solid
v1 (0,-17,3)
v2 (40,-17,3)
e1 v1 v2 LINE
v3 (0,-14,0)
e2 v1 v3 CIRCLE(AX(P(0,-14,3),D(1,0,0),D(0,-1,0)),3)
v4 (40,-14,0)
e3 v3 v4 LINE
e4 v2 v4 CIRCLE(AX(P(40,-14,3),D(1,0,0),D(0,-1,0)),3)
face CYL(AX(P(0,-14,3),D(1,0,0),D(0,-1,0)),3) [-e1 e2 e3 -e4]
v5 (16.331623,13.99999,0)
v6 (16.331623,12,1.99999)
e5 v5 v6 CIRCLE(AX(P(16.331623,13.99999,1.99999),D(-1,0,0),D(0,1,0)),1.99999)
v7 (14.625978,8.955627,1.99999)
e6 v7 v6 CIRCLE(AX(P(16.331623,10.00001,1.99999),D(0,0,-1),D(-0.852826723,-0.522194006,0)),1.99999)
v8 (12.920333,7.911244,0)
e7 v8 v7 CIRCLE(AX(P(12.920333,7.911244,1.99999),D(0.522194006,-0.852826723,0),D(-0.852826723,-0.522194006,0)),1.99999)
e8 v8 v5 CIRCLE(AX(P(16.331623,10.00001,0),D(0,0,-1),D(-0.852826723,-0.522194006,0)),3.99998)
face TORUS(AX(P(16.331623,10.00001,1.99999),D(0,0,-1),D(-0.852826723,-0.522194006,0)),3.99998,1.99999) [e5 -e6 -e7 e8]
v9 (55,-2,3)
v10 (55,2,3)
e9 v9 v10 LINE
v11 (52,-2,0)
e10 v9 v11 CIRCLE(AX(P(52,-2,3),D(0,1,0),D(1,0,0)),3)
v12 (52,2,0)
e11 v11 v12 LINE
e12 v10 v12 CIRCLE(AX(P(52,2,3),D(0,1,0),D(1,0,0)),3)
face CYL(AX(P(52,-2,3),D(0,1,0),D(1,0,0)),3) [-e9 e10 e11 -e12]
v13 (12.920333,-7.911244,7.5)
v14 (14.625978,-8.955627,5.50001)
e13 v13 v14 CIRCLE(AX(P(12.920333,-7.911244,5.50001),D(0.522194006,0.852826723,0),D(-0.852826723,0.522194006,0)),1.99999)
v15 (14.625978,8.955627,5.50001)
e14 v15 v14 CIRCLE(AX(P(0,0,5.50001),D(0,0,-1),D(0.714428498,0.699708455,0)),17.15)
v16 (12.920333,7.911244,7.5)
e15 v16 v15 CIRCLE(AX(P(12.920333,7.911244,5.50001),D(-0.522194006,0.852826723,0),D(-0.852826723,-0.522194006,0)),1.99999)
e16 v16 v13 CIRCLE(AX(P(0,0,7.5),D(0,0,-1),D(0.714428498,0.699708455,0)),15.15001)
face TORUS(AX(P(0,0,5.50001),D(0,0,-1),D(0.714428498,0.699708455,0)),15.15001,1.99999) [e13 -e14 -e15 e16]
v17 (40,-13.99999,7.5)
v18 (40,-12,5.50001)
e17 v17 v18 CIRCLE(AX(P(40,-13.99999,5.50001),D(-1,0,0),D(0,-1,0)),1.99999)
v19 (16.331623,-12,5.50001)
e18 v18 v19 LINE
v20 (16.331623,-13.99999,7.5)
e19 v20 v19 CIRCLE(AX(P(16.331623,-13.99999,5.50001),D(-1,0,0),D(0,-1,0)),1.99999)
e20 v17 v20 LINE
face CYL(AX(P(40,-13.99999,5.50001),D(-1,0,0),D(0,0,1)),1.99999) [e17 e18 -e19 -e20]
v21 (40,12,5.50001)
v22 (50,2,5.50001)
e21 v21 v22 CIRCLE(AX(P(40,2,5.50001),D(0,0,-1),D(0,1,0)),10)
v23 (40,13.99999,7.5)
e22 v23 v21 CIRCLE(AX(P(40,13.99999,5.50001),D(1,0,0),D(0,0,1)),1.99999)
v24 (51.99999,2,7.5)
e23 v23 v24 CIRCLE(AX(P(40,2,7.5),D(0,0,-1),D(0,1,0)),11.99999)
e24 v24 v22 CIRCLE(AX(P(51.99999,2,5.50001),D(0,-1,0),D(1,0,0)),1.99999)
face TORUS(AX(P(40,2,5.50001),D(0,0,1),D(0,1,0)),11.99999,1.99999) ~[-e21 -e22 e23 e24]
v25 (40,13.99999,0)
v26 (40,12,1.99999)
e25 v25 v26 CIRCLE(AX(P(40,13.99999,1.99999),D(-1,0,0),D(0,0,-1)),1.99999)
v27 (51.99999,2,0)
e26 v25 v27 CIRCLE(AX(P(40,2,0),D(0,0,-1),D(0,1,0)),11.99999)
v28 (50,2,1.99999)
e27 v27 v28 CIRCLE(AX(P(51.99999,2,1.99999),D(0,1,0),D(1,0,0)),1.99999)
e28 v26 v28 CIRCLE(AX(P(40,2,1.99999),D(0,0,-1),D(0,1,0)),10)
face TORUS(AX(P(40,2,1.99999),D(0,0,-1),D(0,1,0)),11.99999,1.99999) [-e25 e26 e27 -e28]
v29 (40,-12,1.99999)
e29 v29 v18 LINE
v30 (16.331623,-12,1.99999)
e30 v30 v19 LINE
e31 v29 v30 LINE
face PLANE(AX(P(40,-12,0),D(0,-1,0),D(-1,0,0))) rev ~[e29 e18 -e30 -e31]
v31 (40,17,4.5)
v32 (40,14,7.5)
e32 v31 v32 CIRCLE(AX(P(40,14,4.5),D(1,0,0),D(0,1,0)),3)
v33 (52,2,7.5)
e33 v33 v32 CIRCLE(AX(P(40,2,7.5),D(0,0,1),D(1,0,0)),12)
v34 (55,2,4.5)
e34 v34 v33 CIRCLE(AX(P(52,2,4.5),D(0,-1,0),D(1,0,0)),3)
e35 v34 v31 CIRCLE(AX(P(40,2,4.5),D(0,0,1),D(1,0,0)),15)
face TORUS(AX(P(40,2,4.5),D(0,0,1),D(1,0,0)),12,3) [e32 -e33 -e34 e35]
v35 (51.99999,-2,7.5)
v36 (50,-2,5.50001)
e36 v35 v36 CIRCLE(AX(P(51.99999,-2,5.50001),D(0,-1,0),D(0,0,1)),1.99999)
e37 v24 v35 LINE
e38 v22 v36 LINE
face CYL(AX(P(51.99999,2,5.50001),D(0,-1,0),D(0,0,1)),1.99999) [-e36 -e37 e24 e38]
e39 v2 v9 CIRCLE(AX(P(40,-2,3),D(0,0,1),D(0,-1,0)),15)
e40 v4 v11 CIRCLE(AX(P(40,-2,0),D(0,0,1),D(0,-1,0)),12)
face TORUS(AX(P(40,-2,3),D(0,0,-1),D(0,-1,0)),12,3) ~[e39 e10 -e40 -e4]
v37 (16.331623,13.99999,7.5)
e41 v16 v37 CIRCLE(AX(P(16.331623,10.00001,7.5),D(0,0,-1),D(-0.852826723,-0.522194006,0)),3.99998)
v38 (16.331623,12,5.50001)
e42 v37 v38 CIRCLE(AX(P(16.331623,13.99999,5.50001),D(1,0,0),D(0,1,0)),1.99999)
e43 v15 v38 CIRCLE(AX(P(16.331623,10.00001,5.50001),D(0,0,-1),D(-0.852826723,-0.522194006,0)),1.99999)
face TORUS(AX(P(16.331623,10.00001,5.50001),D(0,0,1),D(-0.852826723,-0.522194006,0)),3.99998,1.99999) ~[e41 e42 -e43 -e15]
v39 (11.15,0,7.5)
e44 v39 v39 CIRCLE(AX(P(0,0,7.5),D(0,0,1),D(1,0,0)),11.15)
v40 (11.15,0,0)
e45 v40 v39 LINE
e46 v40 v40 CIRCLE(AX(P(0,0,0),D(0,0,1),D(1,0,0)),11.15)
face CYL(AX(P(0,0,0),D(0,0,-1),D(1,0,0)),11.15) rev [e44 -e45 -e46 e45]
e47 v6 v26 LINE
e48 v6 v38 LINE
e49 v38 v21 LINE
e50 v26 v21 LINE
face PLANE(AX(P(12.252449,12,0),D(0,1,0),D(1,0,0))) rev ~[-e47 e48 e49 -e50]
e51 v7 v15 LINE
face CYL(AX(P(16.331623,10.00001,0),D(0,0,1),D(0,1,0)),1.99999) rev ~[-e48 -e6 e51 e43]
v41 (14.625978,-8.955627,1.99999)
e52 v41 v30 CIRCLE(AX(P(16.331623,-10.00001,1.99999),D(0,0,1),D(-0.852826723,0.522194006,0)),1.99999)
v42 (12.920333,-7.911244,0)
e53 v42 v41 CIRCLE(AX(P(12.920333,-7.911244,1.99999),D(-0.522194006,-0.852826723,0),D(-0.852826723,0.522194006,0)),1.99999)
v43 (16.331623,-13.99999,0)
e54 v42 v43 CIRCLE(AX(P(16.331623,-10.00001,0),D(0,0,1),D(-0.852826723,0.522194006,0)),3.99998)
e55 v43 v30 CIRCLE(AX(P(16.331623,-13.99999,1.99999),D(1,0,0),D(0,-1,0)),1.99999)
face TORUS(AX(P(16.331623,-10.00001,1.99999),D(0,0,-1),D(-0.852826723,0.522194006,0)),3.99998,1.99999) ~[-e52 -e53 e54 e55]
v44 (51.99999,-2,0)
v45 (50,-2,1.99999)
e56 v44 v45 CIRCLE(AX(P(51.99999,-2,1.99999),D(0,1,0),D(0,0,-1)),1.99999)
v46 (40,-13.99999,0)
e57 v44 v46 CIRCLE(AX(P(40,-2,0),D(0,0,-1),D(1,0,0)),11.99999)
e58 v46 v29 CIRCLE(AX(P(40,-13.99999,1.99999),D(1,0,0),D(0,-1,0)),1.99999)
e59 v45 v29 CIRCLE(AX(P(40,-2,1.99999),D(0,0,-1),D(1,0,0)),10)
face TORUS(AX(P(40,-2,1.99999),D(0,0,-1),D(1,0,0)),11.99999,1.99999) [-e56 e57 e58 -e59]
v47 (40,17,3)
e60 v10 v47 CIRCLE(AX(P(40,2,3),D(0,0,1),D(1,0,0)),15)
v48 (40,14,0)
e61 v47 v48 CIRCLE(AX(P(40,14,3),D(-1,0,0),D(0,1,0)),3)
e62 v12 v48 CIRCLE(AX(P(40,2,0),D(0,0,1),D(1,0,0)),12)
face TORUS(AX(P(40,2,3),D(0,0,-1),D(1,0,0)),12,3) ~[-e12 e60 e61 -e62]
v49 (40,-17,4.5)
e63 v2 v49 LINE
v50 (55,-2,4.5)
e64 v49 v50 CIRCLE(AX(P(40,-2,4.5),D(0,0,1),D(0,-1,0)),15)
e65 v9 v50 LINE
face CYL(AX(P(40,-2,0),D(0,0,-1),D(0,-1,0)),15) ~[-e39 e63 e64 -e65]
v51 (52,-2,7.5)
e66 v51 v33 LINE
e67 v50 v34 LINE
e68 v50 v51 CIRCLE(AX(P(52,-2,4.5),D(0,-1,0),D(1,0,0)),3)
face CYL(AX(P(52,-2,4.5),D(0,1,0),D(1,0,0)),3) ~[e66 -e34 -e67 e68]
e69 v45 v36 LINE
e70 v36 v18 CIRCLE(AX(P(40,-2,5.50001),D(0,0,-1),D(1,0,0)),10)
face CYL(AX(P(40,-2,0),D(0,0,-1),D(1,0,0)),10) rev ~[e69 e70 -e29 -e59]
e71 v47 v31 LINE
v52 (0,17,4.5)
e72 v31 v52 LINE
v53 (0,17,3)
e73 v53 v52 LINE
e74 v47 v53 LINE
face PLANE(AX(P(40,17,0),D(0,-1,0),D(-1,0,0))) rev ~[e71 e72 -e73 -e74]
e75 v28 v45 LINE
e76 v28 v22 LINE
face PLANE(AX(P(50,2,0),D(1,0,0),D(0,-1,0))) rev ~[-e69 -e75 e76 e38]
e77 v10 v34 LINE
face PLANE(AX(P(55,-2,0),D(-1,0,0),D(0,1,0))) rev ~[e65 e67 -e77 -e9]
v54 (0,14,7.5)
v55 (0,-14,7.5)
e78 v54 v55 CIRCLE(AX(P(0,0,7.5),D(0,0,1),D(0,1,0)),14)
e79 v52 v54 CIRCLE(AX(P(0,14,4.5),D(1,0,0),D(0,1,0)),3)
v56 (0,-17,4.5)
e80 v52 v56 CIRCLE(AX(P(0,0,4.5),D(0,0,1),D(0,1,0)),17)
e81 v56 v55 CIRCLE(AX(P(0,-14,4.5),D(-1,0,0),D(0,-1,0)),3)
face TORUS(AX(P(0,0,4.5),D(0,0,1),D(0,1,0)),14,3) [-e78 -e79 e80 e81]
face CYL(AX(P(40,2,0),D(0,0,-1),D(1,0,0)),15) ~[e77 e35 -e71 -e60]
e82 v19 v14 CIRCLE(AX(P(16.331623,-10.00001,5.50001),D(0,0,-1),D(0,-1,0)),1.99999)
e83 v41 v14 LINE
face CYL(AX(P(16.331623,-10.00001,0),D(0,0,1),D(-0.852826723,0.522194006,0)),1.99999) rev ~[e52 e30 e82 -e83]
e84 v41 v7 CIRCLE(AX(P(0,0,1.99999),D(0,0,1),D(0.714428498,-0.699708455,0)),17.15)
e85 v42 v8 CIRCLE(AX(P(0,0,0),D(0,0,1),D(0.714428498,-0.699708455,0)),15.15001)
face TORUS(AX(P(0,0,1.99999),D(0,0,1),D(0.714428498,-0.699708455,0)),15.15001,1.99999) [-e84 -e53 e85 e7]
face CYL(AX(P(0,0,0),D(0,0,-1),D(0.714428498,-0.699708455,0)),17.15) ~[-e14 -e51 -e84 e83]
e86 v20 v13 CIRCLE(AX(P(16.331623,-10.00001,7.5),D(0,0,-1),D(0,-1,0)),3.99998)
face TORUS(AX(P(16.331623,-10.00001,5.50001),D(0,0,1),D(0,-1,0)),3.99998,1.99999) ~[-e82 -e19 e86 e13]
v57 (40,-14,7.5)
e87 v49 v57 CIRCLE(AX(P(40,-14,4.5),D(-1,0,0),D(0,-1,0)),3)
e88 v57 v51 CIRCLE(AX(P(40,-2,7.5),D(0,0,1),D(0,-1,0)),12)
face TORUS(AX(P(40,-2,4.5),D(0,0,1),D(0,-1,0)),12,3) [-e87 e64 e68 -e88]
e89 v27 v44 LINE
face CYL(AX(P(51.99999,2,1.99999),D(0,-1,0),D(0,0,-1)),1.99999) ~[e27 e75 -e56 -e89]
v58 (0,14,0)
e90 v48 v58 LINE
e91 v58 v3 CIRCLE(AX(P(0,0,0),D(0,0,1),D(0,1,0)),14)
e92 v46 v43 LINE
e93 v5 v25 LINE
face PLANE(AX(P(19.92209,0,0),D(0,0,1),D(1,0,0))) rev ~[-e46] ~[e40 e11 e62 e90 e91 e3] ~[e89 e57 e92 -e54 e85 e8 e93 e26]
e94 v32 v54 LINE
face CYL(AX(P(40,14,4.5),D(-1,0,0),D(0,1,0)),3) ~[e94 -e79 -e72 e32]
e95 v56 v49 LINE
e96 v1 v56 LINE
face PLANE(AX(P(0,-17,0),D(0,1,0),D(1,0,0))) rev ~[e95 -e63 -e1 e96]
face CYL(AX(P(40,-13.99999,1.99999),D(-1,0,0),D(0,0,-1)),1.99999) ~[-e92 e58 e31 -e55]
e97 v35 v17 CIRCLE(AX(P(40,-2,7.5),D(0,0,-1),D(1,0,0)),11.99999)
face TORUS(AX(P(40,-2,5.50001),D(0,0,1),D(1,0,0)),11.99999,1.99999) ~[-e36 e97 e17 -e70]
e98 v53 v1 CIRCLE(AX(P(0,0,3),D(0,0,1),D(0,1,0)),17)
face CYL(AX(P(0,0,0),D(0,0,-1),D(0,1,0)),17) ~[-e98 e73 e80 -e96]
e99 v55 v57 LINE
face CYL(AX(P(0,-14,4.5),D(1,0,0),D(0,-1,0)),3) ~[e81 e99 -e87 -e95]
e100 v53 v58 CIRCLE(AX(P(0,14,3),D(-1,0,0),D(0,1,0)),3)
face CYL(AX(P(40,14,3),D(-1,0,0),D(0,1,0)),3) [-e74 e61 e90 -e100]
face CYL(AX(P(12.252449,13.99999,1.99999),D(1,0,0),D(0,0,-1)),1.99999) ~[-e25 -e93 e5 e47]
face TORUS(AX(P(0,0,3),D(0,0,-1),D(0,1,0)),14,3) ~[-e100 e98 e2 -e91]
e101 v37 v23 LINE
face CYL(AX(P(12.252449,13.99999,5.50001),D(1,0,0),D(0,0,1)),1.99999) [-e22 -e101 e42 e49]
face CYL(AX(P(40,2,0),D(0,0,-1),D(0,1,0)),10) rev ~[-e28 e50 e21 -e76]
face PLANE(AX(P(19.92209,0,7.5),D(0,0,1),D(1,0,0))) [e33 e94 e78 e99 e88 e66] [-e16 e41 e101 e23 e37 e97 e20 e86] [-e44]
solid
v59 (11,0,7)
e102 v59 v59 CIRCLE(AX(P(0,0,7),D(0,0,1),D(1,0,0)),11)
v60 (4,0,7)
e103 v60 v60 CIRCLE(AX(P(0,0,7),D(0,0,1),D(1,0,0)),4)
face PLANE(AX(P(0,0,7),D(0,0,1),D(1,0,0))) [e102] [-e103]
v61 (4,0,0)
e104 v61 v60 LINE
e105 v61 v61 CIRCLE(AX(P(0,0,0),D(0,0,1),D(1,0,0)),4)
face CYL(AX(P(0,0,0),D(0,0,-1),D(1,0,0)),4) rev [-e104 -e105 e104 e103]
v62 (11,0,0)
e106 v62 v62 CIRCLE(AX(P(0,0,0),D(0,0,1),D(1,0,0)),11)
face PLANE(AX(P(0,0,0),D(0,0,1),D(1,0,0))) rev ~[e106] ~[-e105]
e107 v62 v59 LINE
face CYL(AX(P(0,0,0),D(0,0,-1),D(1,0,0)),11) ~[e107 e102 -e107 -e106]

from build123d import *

# Parameters (mm, degrees)
F0_R     = 11
F0_R_2   = 4
F1_DEPTH = 7
F2_R     = 11.15
F3_DEPTH = 7.5
F4_R     = 3
F6_DEPTH = 25
F7_R     = 1.99999


# Not quite as in the source:
# - a fillet or chamfer is up to 0.001 mm smaller than in the source, because OpenCascade refuses the exact size


with BuildPart() as f1:
    # F0 (on Top) → F1 (new body)
    with BuildSketch(Plane.XY):
        Circle(F0_R)
        Circle(F0_R_2, mode=Mode.SUBTRACT)
    extrude(amount=F1_DEPTH)


with BuildPart() as f3:
    # F2 (on Top) → F3 (new body)
    with BuildSketch(Plane.XY):
        with BuildLine():
            Line((40, 17), (0, 17))
            ThreePointArc((0, 17), (-17, 0), (0, -17))
            Line((0, -17), (40, -17))
            ThreePointArc((40, -17), (50.6066017178, -12.6066017178), (55, -2))
            Line((55, -2), (55, 2))
            ThreePointArc((55, 2), (50.6066017178, 12.6066017178), (40, 17))
        make_face()
        Circle(F2_R, mode=Mode.SUBTRACT)
    extrude(amount=F3_DEPTH)

    # F4
    f4_edges = [f3.edges().sort_by_distance(p)[0] for p in [
        (20, -17, 7.5),
        (50.606602, -12.606602, 7.5),
        (20, -17, 0),
        (20, 17, 0),
        (20, 17, 7.5),
        (-17, 0, 0),
        (-17, 0, 7.5),
        (50.606602, -12.606602, 0),
        (55, 0, 0),
        (55, 0, 7.5),
        (50.606602, 12.606602, 0),
        (50.606602, 12.606602, 7.5),
    ]]
    fillet(f4_edges, radius=F4_R)

    # F5 (on face) → F6 (cut)
    with BuildSketch(Plane(origin=(0, 0, 0), x_dir=(1, 0, 0), z_dir=(0, 0, -1))):
        with BuildLine():
            ThreePointArc((50, 2), (47.0710678119, 9.0710678119), (40, 12))
            Line((40, 12), (12.2524487348, 12))
            ThreePointArc((12.2524487348, 12), (17.15, 0), (12.2524487348, -12))
            Line((12.2524487348, -12), (40, -12))
            ThreePointArc((40, -12), (47.0710678119, -9.0710678119), (50, -2))
            Line((50, -2), (50, 2))
        make_face()
    extrude(amount=-F6_DEPTH, mode=Mode.SUBTRACT)

    # F7 (radius 2 in the source; OpenCascade refuses exactly that, so slightly less here)
    f7_edges = [f3.edges().sort_by_distance(p)[0] for p in [
        (26.126224, -12, 0),
        (12.252449, -12, 3.75),
        (47.071068, -9.071068, 7.5),
        (47.071068, 9.071068, 7.5),
        (26.126224, 12, 7.5),
        (47.071068, 9.071068, 0),
        (26.126224, 12, 0),
        (47.071068, -9.071068, 0),
        (50, 0, 7.5),
        (50, 0, 0),
        (12.252449, 12, 3.75),
        (17.15, 0, 0),
        (17.15, 0, 7.5),
        (26.126224, -12, 7.5),
    ]]
    fillet(f7_edges, radius=F7_R)


solid = Compound([f1.part, f3.part])
